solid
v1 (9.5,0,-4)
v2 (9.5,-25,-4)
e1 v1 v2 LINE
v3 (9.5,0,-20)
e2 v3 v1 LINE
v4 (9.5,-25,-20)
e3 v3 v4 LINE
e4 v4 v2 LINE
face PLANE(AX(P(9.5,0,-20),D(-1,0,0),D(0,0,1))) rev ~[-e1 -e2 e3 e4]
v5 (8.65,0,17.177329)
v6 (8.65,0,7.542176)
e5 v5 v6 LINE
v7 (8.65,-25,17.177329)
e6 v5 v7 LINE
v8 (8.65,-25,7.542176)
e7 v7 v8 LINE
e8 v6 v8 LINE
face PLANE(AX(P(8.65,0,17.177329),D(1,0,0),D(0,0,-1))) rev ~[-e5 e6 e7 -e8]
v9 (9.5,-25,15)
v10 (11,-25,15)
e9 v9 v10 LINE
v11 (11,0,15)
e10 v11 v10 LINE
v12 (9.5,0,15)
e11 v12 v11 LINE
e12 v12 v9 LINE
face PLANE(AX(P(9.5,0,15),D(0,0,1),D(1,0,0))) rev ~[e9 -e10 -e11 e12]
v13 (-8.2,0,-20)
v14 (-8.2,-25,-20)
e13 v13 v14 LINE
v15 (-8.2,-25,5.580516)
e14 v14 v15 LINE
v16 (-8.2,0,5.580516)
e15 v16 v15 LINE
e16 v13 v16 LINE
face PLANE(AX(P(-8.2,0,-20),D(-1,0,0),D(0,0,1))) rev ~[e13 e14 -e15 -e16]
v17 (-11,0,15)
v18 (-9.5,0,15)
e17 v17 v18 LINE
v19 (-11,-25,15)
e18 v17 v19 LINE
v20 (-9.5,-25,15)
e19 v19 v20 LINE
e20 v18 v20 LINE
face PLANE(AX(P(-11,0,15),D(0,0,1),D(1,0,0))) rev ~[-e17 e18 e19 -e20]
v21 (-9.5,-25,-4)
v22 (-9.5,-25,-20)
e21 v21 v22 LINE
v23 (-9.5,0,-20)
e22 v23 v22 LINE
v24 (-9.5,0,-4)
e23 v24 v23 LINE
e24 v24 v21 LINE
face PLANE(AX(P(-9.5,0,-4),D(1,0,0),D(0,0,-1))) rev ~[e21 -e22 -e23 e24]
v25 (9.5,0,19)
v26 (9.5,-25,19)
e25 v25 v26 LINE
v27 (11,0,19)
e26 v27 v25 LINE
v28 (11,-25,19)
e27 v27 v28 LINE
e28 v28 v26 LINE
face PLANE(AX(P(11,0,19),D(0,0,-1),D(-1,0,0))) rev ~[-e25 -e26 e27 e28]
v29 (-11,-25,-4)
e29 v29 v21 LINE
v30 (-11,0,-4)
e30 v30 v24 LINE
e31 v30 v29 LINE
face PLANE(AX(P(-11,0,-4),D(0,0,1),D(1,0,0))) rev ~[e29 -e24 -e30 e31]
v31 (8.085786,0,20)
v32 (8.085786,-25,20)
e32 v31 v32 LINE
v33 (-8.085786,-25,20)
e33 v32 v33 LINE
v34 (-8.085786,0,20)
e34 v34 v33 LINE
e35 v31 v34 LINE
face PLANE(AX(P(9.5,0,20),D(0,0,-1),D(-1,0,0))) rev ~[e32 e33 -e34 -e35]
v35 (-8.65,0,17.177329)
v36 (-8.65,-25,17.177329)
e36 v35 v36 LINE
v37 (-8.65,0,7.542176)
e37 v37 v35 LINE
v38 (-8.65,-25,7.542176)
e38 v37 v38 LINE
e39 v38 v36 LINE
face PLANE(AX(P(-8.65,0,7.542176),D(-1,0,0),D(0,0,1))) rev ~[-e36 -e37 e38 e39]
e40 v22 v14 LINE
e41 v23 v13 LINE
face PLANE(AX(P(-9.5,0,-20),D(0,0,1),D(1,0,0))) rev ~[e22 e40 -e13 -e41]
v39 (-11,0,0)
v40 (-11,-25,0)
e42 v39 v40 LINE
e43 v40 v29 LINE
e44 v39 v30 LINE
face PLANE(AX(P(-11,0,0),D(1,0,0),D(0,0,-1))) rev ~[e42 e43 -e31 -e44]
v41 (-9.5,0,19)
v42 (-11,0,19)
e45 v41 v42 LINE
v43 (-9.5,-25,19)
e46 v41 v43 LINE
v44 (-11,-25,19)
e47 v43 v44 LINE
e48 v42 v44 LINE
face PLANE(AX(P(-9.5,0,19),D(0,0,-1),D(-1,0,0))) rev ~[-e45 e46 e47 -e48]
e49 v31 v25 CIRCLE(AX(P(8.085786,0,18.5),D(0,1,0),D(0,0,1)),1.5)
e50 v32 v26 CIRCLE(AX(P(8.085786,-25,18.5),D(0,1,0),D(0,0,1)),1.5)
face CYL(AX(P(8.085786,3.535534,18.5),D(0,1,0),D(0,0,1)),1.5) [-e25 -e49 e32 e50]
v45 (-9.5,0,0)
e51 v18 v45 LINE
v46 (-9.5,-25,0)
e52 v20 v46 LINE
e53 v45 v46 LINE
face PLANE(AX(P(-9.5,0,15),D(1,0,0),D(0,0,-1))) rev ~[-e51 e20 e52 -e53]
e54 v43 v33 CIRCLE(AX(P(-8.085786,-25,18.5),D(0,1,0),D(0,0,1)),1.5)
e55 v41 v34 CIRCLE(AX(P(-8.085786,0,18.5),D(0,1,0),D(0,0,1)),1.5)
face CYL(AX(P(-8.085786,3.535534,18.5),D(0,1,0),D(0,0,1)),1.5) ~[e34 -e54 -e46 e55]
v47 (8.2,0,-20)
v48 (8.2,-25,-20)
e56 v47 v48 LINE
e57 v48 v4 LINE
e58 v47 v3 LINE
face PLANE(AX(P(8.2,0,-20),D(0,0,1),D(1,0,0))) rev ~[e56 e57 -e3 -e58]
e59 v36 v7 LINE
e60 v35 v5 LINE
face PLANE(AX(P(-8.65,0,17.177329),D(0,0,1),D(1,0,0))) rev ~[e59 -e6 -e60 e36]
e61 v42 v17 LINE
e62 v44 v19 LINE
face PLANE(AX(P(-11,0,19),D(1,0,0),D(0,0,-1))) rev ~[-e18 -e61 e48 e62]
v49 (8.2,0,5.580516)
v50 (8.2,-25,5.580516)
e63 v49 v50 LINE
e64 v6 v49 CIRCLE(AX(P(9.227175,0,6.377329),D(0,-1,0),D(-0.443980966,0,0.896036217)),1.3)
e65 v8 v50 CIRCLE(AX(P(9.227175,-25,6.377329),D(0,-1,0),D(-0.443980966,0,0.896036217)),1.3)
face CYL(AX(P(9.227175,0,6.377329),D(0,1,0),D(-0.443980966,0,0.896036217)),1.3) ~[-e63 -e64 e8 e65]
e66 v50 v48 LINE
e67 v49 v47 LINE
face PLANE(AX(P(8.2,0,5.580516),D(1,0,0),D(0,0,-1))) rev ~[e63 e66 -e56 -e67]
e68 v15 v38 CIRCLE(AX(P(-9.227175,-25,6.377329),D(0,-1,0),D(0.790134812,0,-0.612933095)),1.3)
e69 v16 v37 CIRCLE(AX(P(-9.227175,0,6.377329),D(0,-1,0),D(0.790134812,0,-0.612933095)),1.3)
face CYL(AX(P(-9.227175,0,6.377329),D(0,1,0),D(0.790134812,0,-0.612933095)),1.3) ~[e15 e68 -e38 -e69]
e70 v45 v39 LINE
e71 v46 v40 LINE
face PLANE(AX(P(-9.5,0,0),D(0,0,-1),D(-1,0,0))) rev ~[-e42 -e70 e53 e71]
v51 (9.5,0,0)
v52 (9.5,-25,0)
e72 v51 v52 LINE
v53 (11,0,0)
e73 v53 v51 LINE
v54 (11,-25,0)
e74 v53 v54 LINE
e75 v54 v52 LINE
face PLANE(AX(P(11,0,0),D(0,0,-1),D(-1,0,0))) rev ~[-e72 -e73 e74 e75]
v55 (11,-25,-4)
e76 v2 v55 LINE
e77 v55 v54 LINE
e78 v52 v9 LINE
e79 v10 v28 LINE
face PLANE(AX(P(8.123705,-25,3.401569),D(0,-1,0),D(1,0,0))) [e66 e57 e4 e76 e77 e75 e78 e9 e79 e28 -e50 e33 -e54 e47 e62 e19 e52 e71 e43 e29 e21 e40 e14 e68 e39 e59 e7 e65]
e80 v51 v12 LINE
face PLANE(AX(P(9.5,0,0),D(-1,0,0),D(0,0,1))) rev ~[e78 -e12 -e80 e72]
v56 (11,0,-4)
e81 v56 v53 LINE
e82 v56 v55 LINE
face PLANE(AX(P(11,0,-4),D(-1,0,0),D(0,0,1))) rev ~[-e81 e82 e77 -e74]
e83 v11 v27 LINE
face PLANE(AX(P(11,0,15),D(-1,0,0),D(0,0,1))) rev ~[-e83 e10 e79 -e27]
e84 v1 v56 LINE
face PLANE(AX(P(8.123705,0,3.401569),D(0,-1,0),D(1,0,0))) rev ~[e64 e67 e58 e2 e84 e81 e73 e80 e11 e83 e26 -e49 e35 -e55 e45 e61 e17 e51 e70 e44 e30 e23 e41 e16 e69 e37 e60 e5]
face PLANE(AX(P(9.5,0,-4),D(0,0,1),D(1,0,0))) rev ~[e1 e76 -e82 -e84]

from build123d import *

# Parameters (mm, degrees)
F1_DEPTH    = 25
F2_T1_DEPTH = 32.0710678119


# Not quite as in the source:
# - a fillet or chamfer that OpenCascade refuses, or shapes differently, is made with other operations: its cross-section is extruded or revolved along the edge and cut away or added


with BuildPart() as f1:
    # F0 (on Front) → F1 (new body)
    with BuildSketch(Plane.XZ):
        with BuildLine():
            Line((9.5, 20), (0, 20))
            Line((0, 20), (0, 17.1773286244))
            Line((0, 17.1773286244), (8.65, 17.1773286244))
            Line((8.65, 17.1773286244), (8.65, 7.5421757065))
            ThreePointArc((8.65, 7.5421757065), (7.9600869661, 6.6679955593), (8.2, 5.5805156007))
            Line((8.2, 5.5805156007), (8.2, -20))
            Line((8.2, -20), (9.5, -20))
            Line((9.5, -20), (9.5, -4))
            Line((9.5, -4), (11, -4))
            Line((11, -4), (11, 0))
            Line((11, 0), (9.5, 0))
            Line((9.5, 0), (9.5, 15))
            Line((9.5, 15), (11, 15))
            Line((11, 15), (11, 19))
            Line((11, 19), (9.5, 19))
            Line((9.5, 19), (9.5, 20))
        make_face()
        with BuildLine():
            Line((0, 17.1773286244), (0, 20))
            Line((0, 20), (-9.5, 20))
            Line((-9.5, 20), (-9.5, 19))
            Line((-9.5, 19), (-11, 19))
            Line((-11, 19), (-11, 15))
            Line((-11, 15), (-9.5, 15))
            Line((-9.5, 15), (-9.5, 0))
            Line((-9.5, 0), (-11, 0))
            Line((-11, 0), (-11, -4))
            Line((-11, -4), (-9.5, -4))
            Line((-9.5, -4), (-9.5, -20))
            Line((-9.5, -20), (-8.2, -20))
            Line((-8.2, -20), (-8.2, 5.5805156007))
            ThreePointArc((-8.2, 5.5805156007), (-7.9600869661, 6.6679955593), (-8.65, 7.5421757065))
            Line((-8.65, 7.5421757065), (-8.65, 17.1773286244))
            Line((-8.65, 17.1773286244), (0, 17.1773286244))
        make_face()
    extrude(amount=F1_DEPTH)

    # F2: fillet of radius 1.5 on 2 edges, made by hand

    # F2_s2 → F2_t1 (cut)
    with BuildSketch(Plane.XZ.offset(-3.5355339059)):
        with BuildLine():
            ThreePointArc((-8.0857864376, 20), (-8.9518118414, 19.7247448714), (-9.5, 19))
            Line((-9.5, 19), (-9.5, 20))
            Line((-9.5, 20), (-8.0857864376, 20))
        make_face()
        with BuildLine():
            ThreePointArc((8.0857864376, 20), (8.9518118414, 19.7247448714), (9.5, 19))
            Line((9.5, 19), (9.5, 20))
            Line((9.5, 20), (8.0857864376, 20))
        make_face()
    extrude(amount=F2_T1_DEPTH, mode=Mode.SUBTRACT)


solid = f1.part
